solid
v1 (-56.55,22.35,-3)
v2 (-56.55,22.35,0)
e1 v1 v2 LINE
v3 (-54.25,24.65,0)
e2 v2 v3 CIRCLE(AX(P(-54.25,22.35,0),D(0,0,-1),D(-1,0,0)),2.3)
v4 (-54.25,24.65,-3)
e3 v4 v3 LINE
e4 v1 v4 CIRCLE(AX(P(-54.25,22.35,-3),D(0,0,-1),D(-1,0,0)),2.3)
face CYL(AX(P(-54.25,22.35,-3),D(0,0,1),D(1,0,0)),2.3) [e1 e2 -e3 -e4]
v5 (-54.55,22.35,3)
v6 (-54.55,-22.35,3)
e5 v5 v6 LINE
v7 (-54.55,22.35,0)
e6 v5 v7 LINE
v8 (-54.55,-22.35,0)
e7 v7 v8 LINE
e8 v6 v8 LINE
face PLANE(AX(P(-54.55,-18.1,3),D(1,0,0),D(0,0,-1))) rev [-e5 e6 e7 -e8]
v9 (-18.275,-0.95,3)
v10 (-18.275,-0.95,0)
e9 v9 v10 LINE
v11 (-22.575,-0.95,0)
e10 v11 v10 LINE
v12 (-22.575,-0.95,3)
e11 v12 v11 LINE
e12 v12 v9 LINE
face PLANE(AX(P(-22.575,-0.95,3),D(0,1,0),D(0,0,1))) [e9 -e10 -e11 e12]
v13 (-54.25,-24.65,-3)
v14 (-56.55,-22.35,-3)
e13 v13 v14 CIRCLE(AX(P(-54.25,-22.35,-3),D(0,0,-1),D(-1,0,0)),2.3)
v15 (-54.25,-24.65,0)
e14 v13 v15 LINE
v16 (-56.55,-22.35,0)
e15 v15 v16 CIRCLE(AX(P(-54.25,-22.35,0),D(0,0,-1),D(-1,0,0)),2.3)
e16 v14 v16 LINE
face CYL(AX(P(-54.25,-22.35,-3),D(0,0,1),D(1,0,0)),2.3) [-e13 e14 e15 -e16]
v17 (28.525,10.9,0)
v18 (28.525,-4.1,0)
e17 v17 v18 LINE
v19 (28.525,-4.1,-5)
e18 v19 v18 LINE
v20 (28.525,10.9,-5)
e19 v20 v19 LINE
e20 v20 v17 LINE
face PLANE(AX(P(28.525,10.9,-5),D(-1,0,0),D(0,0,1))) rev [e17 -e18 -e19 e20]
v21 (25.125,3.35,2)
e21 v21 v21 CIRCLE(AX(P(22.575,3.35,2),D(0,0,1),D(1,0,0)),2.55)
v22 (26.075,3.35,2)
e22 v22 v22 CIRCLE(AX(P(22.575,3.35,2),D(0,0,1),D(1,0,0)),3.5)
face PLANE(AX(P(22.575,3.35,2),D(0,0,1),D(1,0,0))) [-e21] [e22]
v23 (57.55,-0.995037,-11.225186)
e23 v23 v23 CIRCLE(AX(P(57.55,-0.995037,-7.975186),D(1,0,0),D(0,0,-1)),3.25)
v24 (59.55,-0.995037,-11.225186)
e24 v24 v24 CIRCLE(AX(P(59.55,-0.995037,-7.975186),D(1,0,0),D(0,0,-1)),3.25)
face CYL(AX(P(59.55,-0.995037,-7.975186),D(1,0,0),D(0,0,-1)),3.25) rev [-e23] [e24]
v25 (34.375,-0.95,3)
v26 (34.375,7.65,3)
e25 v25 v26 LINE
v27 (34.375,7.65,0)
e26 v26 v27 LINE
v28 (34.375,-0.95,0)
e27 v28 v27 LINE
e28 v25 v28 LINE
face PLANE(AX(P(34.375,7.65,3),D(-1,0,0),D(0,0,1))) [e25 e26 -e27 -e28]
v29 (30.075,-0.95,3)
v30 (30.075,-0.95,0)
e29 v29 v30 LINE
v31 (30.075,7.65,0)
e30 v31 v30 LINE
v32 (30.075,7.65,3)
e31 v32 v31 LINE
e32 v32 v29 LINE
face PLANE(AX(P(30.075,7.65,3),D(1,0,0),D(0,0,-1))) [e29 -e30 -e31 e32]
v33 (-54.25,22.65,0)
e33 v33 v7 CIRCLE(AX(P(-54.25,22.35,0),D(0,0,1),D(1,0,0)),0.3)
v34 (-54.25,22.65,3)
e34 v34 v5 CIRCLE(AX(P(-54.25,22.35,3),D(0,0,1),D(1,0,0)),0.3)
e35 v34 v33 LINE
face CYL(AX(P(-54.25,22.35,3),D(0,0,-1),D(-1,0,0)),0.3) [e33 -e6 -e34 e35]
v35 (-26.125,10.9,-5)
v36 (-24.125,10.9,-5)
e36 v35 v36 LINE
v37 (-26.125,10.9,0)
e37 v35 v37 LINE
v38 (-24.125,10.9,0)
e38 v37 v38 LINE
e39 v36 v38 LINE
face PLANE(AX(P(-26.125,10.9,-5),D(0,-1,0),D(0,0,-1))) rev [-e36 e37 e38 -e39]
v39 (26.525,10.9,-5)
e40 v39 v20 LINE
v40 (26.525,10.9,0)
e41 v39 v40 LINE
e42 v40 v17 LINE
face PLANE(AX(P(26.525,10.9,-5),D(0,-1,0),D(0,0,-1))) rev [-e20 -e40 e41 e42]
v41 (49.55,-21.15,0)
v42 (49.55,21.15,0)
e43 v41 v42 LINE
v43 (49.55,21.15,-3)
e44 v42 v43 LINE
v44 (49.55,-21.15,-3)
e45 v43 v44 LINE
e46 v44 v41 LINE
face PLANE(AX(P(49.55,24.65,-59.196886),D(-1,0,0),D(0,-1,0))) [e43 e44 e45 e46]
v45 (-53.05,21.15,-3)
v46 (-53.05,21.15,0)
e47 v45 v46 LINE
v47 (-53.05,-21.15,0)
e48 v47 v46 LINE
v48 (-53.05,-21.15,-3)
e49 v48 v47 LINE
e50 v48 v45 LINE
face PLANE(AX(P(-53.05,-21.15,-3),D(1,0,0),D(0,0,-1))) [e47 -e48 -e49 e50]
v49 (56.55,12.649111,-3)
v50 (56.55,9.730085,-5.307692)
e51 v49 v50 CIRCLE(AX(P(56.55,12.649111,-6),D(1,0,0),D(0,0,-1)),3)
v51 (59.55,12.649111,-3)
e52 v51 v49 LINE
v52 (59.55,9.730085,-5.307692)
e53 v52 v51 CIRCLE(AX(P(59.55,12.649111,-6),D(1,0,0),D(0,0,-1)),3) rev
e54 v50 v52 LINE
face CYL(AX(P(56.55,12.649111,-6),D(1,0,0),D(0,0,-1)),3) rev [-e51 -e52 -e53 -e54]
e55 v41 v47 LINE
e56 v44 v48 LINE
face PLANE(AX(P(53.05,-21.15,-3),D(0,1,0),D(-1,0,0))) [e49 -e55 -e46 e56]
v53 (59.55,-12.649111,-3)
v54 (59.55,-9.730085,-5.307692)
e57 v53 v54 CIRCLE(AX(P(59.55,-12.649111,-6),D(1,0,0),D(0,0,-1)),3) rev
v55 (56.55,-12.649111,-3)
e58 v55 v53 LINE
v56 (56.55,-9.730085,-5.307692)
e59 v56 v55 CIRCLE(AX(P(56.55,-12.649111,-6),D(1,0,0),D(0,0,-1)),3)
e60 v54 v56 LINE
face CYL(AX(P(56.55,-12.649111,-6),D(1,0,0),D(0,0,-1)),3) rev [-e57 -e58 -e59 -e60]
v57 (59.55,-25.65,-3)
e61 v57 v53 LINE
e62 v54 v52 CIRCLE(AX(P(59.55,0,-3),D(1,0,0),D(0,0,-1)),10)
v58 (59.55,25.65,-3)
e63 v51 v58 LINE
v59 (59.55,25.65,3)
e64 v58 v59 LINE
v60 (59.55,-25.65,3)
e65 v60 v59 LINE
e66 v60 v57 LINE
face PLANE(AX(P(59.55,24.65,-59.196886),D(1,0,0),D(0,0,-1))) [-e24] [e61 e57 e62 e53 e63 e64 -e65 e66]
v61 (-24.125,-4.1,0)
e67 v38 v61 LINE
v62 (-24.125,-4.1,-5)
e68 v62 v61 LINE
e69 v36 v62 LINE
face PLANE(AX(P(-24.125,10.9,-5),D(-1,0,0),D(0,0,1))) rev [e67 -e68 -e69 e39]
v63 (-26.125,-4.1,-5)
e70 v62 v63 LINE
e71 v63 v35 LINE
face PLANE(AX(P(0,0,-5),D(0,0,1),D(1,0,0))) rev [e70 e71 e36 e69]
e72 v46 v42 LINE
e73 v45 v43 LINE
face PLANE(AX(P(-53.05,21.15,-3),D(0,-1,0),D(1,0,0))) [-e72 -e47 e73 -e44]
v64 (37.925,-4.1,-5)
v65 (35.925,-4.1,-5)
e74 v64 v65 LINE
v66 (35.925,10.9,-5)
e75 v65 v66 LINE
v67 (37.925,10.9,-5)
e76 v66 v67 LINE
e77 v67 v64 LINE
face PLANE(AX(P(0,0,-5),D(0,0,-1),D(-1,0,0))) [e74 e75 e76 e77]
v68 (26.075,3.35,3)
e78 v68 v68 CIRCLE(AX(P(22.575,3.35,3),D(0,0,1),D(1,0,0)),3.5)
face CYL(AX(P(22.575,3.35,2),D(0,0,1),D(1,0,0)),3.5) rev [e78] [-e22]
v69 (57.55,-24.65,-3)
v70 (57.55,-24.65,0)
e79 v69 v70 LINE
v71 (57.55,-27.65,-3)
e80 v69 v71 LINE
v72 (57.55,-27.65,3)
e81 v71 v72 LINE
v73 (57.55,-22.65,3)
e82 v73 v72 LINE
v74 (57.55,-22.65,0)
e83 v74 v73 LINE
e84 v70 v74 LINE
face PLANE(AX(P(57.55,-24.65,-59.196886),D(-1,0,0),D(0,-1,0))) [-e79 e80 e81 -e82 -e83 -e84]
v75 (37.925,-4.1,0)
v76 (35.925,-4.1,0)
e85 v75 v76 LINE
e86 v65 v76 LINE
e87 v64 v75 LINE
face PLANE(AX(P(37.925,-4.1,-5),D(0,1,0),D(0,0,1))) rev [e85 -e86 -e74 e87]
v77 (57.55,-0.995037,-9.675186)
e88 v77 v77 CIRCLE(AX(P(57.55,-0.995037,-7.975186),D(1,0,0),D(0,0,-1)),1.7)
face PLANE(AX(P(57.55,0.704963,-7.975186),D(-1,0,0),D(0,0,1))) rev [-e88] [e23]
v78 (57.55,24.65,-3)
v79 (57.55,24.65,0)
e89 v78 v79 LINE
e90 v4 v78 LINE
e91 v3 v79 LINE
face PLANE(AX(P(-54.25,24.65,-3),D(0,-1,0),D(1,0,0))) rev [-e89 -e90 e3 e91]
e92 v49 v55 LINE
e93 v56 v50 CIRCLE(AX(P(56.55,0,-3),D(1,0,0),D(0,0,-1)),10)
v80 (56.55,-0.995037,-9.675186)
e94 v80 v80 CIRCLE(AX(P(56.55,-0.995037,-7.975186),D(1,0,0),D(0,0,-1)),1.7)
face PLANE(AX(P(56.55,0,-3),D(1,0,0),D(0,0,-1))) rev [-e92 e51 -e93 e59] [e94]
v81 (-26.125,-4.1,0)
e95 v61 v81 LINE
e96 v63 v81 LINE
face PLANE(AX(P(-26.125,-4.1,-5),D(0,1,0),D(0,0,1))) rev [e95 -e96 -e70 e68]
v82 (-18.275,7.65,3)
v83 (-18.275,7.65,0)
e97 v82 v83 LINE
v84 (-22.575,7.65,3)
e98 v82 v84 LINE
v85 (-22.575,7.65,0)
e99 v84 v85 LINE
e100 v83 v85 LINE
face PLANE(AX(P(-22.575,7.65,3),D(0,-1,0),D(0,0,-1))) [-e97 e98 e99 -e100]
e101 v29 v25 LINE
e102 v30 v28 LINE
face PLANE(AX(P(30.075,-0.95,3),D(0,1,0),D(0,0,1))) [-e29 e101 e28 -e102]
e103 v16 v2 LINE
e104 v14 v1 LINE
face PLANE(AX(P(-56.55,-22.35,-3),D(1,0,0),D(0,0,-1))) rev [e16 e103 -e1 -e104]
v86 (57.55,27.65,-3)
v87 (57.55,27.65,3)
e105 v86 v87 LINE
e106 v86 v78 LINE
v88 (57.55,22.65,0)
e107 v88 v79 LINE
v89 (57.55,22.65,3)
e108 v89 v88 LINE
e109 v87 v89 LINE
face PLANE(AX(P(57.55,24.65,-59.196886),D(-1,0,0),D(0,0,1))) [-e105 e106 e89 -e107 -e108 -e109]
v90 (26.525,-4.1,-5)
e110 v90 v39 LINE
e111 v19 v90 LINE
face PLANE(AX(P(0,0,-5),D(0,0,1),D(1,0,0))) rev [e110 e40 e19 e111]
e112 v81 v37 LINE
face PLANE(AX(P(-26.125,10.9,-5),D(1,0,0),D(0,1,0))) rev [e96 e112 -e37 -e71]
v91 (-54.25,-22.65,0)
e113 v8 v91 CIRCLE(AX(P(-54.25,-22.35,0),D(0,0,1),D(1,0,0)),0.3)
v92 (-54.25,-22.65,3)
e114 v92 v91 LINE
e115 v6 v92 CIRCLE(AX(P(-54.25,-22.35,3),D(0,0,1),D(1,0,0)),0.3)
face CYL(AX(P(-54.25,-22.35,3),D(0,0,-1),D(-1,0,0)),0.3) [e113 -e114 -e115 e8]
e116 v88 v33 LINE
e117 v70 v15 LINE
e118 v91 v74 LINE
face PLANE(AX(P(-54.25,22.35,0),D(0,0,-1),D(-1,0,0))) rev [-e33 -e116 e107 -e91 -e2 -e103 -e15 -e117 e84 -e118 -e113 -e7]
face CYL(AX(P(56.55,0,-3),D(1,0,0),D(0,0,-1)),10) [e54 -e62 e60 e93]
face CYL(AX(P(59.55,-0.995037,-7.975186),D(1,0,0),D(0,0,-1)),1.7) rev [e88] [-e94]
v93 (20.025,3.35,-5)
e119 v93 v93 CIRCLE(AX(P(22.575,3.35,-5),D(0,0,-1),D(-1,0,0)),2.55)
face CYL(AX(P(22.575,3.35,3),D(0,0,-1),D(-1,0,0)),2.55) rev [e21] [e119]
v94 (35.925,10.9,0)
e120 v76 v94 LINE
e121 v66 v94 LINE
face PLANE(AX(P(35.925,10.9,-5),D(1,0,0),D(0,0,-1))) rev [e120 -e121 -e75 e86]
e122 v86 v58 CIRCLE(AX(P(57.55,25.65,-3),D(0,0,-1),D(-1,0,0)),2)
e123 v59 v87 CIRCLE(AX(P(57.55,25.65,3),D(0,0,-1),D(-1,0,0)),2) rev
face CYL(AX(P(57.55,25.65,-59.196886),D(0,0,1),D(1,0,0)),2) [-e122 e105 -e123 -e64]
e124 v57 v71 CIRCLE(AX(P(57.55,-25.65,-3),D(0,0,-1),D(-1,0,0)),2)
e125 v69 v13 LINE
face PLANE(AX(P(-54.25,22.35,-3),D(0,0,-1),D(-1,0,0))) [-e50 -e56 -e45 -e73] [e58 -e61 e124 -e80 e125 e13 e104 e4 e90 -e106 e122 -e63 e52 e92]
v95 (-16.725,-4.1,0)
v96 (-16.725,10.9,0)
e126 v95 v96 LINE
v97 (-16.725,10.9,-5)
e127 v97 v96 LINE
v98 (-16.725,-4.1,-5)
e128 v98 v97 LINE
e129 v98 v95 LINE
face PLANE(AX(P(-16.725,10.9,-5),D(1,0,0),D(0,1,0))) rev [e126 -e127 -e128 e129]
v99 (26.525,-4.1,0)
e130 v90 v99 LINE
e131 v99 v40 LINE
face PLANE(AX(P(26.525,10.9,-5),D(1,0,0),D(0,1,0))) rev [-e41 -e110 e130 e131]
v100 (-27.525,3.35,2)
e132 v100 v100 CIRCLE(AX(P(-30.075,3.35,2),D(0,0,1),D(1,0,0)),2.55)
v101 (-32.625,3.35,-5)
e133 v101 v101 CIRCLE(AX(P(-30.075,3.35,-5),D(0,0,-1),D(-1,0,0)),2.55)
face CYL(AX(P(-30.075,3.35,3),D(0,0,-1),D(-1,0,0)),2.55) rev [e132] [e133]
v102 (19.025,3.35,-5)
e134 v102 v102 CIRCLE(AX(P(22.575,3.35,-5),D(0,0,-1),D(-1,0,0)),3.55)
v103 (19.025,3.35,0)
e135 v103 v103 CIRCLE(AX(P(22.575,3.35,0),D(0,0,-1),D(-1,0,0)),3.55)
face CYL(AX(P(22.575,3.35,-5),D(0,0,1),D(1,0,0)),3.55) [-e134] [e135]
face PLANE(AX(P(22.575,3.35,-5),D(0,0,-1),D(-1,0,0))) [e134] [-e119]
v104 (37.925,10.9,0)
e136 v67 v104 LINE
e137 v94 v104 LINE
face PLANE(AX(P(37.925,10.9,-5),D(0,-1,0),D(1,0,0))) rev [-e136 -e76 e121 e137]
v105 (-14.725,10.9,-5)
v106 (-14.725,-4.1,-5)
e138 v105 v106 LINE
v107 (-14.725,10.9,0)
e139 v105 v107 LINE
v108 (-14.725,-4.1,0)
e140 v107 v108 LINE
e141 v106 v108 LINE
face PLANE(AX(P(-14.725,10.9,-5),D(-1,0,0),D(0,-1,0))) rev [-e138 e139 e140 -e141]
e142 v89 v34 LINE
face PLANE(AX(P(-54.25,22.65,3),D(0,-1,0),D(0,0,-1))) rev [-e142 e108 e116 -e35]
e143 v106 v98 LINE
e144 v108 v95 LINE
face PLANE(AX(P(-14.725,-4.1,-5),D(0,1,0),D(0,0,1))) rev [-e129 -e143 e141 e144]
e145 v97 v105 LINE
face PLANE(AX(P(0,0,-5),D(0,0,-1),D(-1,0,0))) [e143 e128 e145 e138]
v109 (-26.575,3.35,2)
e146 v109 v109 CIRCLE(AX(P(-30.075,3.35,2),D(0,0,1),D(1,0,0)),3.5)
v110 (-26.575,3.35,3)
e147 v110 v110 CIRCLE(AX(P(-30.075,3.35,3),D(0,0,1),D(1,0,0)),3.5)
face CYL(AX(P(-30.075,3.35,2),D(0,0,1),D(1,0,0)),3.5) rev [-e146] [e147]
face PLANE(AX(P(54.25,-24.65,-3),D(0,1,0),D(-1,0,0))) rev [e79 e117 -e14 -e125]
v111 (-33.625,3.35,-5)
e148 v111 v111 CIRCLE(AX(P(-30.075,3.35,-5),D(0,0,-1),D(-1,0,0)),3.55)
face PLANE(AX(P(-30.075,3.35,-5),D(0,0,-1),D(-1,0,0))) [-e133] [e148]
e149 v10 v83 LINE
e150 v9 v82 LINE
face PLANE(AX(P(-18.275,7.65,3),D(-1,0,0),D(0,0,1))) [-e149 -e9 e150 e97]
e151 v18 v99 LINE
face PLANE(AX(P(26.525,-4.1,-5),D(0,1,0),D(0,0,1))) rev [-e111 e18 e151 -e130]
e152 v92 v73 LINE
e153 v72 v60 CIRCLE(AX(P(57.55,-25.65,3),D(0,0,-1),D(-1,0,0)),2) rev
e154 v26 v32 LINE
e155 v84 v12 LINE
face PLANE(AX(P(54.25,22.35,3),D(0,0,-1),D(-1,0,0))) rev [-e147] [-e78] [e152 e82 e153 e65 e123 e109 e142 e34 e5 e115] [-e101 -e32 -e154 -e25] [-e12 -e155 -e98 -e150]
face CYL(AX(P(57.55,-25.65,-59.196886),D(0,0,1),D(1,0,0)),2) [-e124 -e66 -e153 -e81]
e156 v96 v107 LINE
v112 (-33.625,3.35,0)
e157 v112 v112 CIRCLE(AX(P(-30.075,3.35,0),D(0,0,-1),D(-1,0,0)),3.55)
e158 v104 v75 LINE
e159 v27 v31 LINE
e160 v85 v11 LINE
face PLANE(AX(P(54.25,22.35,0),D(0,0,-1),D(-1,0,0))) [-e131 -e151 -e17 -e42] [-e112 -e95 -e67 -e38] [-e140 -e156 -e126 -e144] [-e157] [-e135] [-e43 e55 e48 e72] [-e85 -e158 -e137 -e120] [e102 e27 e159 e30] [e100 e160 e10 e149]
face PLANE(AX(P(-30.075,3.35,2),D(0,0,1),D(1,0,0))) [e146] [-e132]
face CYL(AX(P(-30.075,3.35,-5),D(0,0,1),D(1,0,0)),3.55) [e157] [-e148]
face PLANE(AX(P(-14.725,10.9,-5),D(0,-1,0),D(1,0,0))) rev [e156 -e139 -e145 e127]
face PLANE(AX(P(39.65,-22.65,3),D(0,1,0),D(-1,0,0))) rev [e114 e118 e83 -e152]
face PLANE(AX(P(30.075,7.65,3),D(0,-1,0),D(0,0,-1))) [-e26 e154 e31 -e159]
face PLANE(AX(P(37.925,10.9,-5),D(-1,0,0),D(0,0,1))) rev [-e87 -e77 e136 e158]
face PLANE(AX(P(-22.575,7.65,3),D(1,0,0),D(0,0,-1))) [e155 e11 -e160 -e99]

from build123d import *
from build123d.topology import SkipClean

# Parameters (mm, degrees)
SKETCH1_R                                   = 2.55
SKETCH1_W                                   = 4.3
SKETCH1_H                                   = 8.6
BOSS_EXTRUDE1_DEPTH                         = 3
SKETCH2_R                                   = 3.5
CUT_EXTRUDE1_DEPTH                          = 1
BOSS_EXTRUDE2_START                         = 5
SKETCH3_R                                   = 3.55
SKETCH3_R_2                                 = 2.55
BOSS_EXTRUDE2_DEPTH                         = 5
SKETCH7_W                                   = 2
SKETCH7_H                                   = 15
BOSS_EXTRUDE4_DEPTH                         = 5
SKETCH16_W                                  = 106.1
SKETCH16_H                                  = 42.3
BOSS_EXTRUDE9_DEPTH                         = 3
BOSS_EXTRUDE10_START                        = -6
BOSS_EXTRUDE10_DEPTH                        = 6
FILLET1_R                                   = 2
BOSS_EXTRUDE11_DEPTH                        = 3
FILLET2_R                                   = 3
CBORE_FOR_M3_CHEESE_HEAD_SCREW1_D           = 3.4
CBORE_FOR_M3_CHEESE_HEAD_SCREW1_CBORE_D     = 6.5
CBORE_FOR_M3_CHEESE_HEAD_SCREW1_CBORE_DEPTH = 2
SKETCH20_W                                  = 3
SKETCH20_H                                  = 2
CUT_EXTRUDE3_DEPTH                          = 8


with BuildPart() as part:
    # Sketch1 → Boss-Extrude1 (new body)
    with BuildSketch(Plane.XY):
        with BuildLine():
            Line((-54.25, 22.65), (-37.75, 22.65))
            Line((-37.75, 22.65), (-7.55, 22.65))
            Line((-7.55, 22.65), (7.55, 22.65))
            Line((7.55, 22.65), (37.75, 22.65))
            Line((37.75, 22.65), (54.25, 22.65))
            ThreePointArc((54.25, 22.65), (54.462132034, 22.562132034), (54.55, 22.35))
            Line((54.55, 22.35), (54.55, 12.1))
            Line((54.55, 12.1), (54.55, -18.1))
            Line((54.55, -18.1), (54.55, -22.35))
            ThreePointArc((54.55, -22.35), (54.462132034, -22.562132034), (54.25, -22.65))
            Line((54.25, -22.65), (39.65, -22.65))
            Line((39.65, -22.65), (9.45, -22.65))
            Line((9.45, -22.65), (-9.45, -22.65))
            Line((-9.45, -22.65), (-39.65, -22.65))
            Line((-39.65, -22.65), (-54.25, -22.65))
            ThreePointArc((-54.25, -22.65), (-54.462132034, -22.562132034), (-54.55, -22.35))
            Line((-54.55, -22.35), (-54.55, -18.1))
            Line((-54.55, -18.1), (-54.55, 12.1))
            Line((-54.55, 12.1), (-54.55, 22.35))
            ThreePointArc((-54.55, 22.35), (-54.462132034, 22.562132034), (-54.25, 22.65))
        make_face()
        with Locations((-30.075, 3.35)):
            Circle(SKETCH1_R, mode=Mode.SUBTRACT)
        with Locations((22.575, 3.35)):
            Circle(SKETCH1_R, mode=Mode.SUBTRACT)
        with Locations((32.225, 3.35)):
            Rectangle(SKETCH1_W, SKETCH1_H, mode=Mode.SUBTRACT)
        with Locations((-20.425, 3.35)):
            Rectangle(SKETCH1_W, SKETCH1_H, mode=Mode.SUBTRACT)
    extrude(amount=BOSS_EXTRUDE1_DEPTH)

    # Sketch2 → Cut-Extrude1 (cut)
    with BuildSketch(Plane.XY.offset(3)):
        with Locations((-30.075, 3.35)):
            Circle(SKETCH2_R)
        with Locations((22.575, 3.35)):
            Circle(SKETCH2_R)
    extrude(amount=-CUT_EXTRUDE1_DEPTH, mode=Mode.SUBTRACT)

    # Sketch3 → Boss-Extrude2 (add)
    # profile 1 of 2: a face of its own
    with BuildSketch(Plane(origin=(0, 0, 0), x_dir=(-1, 0, 0), z_dir=(0, 0, -1)).offset(BOSS_EXTRUDE2_START)):
        with Locations((-22.575, 3.35)):
            Circle(SKETCH3_R)
        with Locations((-22.575, 3.35)):
            Circle(SKETCH3_R_2, mode=Mode.SUBTRACT)
    # profile 2 of 2: a face of its own
    with BuildSketch(Plane(origin=(0, 0, 0), x_dir=(-1, 0, 0), z_dir=(0, 0, -1)).offset(BOSS_EXTRUDE2_START)):
        with Locations((30.075, 3.35)):
            Circle(SKETCH3_R)
        with Locations((30.075, 3.35)):
            Circle(SKETCH3_R_2, mode=Mode.SUBTRACT)
    extrude(amount=-BOSS_EXTRUDE2_DEPTH)

    # Sketch7 → Boss-Extrude4 (add)
    with BuildSketch(Plane(origin=(0, 0, 0), x_dir=(-1, 0, 0), z_dir=(0, 0, -1))):
        with Locations((-27.525, 3.4)):
            Rectangle(SKETCH7_W, SKETCH7_H)
        with Locations((-36.925, 3.4)):
            Rectangle(SKETCH7_W, SKETCH7_H)
        with Locations((25.125, 3.4)):
            Rectangle(SKETCH7_W, SKETCH7_H)
        with Locations((15.725, 3.4)):
            Rectangle(SKETCH7_W, SKETCH7_H)
    extrude(amount=BOSS_EXTRUDE4_DEPTH)

    # Sketch16 → Boss-Extrude9 (add)
    with BuildSketch(Plane(origin=(0, 0, 0), x_dir=(-1, 0, 0), z_dir=(0, 0, -1))):
        with BuildLine():
            Line((54.25, 24.65), (-54.25, 24.65))
            ThreePointArc((-54.25, 24.65), (-55.876345597, 23.976345597), (-56.55, 22.35))
            Line((-56.55, 22.35), (-56.55, -22.35))
            ThreePointArc((-56.55, -22.35), (-55.876345597, -23.976345597), (-54.25, -24.65))
            Line((-54.25, -24.65), (54.25, -24.65))
            ThreePointArc((54.25, -24.65), (55.876345597, -23.976345597), (56.55, -22.35))
            Line((56.55, -22.35), (56.55, 22.35))
            ThreePointArc((56.55, 22.35), (55.876345597, 23.976345597), (54.25, 24.65))
        make_face()
        Rectangle(SKETCH16_W, SKETCH16_H, mode=Mode.SUBTRACT)
    extrude(amount=BOSS_EXTRUDE9_DEPTH)

    # Sketch17 → Boss-Extrude10 (add)
    with BuildSketch(Plane.XY.offset(3).offset(BOSS_EXTRUDE10_START)):
        Polygon((49.55, -24.65), (57.55, -24.65), (57.55, -27.65), (59.55, -27.65), (59.55, -24.65), (59.55, 24.65), (59.55, 27.65), (57.55, 27.65), (57.55, 24.65), (49.55, 24.65), align=None)
    extrude(amount=BOSS_EXTRUDE10_DEPTH)

    # Fillet1
    fillet1_edges = [part.edges().sort_by_distance(p)[0] for p in [
        (59.55, 27.65, 0),
        (59.55, -27.65, 0),
    ]]
    fillet(fillet1_edges, radius=FILLET1_R - 0.0001)  # a hair under: the kernel refuses the full size

    # Sketch18 → Boss-Extrude11 (add)
    with BuildSketch(Plane(origin=(59.55, 0, 0), x_dir=(0, 0, -1), z_dir=(1, 0, 0))):
        with BuildLine():
            Line((3, -10), (3, 10))
            ThreePointArc((3, 10), (13, 0), (3, -10))
        make_face()
    extrude(amount=-BOSS_EXTRUDE11_DEPTH)

    # Fillet2
    fillet2_edges = [part.edges().sort_by_distance(p)[0] for p in [
        (58.05, 10, -3),
        (58.05, -10, -3),
    ]]
    fillet(fillet2_edges, radius=FILLET2_R)

    # CBORE for M3 Cheese Head Screw1 (through all)
    with Locations(Plane(origin=(59.55, -0.99503719, -7.975185951), x_dir=(0, 0, 1), z_dir=(1, 0, 0))):
        with Locations((0, 0)):
            CounterBoreHole(CBORE_FOR_M3_CHEESE_HEAD_SCREW1_D / 2, CBORE_FOR_M3_CHEESE_HEAD_SCREW1_CBORE_D / 2, CBORE_FOR_M3_CHEESE_HEAD_SCREW1_CBORE_DEPTH)

    # Sketch20 → Cut-Extrude3 (cut)
    with SkipClean():  # the faces are left unmerged after this step: merging them gives an invalid solid
        with BuildSketch(Plane.ZY.offset(-49.55)):
            with Locations((1.5, -23.65)):
                Rectangle(SKETCH20_W, SKETCH20_H)
            with Locations((1.5, 23.65)):
                Rectangle(SKETCH20_W, SKETCH20_H)
        extrude(amount=-CUT_EXTRUDE3_DEPTH, mode=Mode.SUBTRACT)
    add(part.part.scale(1), mode=Mode.REPLACE)  # the faces are merged on a copy


solid = part.part
